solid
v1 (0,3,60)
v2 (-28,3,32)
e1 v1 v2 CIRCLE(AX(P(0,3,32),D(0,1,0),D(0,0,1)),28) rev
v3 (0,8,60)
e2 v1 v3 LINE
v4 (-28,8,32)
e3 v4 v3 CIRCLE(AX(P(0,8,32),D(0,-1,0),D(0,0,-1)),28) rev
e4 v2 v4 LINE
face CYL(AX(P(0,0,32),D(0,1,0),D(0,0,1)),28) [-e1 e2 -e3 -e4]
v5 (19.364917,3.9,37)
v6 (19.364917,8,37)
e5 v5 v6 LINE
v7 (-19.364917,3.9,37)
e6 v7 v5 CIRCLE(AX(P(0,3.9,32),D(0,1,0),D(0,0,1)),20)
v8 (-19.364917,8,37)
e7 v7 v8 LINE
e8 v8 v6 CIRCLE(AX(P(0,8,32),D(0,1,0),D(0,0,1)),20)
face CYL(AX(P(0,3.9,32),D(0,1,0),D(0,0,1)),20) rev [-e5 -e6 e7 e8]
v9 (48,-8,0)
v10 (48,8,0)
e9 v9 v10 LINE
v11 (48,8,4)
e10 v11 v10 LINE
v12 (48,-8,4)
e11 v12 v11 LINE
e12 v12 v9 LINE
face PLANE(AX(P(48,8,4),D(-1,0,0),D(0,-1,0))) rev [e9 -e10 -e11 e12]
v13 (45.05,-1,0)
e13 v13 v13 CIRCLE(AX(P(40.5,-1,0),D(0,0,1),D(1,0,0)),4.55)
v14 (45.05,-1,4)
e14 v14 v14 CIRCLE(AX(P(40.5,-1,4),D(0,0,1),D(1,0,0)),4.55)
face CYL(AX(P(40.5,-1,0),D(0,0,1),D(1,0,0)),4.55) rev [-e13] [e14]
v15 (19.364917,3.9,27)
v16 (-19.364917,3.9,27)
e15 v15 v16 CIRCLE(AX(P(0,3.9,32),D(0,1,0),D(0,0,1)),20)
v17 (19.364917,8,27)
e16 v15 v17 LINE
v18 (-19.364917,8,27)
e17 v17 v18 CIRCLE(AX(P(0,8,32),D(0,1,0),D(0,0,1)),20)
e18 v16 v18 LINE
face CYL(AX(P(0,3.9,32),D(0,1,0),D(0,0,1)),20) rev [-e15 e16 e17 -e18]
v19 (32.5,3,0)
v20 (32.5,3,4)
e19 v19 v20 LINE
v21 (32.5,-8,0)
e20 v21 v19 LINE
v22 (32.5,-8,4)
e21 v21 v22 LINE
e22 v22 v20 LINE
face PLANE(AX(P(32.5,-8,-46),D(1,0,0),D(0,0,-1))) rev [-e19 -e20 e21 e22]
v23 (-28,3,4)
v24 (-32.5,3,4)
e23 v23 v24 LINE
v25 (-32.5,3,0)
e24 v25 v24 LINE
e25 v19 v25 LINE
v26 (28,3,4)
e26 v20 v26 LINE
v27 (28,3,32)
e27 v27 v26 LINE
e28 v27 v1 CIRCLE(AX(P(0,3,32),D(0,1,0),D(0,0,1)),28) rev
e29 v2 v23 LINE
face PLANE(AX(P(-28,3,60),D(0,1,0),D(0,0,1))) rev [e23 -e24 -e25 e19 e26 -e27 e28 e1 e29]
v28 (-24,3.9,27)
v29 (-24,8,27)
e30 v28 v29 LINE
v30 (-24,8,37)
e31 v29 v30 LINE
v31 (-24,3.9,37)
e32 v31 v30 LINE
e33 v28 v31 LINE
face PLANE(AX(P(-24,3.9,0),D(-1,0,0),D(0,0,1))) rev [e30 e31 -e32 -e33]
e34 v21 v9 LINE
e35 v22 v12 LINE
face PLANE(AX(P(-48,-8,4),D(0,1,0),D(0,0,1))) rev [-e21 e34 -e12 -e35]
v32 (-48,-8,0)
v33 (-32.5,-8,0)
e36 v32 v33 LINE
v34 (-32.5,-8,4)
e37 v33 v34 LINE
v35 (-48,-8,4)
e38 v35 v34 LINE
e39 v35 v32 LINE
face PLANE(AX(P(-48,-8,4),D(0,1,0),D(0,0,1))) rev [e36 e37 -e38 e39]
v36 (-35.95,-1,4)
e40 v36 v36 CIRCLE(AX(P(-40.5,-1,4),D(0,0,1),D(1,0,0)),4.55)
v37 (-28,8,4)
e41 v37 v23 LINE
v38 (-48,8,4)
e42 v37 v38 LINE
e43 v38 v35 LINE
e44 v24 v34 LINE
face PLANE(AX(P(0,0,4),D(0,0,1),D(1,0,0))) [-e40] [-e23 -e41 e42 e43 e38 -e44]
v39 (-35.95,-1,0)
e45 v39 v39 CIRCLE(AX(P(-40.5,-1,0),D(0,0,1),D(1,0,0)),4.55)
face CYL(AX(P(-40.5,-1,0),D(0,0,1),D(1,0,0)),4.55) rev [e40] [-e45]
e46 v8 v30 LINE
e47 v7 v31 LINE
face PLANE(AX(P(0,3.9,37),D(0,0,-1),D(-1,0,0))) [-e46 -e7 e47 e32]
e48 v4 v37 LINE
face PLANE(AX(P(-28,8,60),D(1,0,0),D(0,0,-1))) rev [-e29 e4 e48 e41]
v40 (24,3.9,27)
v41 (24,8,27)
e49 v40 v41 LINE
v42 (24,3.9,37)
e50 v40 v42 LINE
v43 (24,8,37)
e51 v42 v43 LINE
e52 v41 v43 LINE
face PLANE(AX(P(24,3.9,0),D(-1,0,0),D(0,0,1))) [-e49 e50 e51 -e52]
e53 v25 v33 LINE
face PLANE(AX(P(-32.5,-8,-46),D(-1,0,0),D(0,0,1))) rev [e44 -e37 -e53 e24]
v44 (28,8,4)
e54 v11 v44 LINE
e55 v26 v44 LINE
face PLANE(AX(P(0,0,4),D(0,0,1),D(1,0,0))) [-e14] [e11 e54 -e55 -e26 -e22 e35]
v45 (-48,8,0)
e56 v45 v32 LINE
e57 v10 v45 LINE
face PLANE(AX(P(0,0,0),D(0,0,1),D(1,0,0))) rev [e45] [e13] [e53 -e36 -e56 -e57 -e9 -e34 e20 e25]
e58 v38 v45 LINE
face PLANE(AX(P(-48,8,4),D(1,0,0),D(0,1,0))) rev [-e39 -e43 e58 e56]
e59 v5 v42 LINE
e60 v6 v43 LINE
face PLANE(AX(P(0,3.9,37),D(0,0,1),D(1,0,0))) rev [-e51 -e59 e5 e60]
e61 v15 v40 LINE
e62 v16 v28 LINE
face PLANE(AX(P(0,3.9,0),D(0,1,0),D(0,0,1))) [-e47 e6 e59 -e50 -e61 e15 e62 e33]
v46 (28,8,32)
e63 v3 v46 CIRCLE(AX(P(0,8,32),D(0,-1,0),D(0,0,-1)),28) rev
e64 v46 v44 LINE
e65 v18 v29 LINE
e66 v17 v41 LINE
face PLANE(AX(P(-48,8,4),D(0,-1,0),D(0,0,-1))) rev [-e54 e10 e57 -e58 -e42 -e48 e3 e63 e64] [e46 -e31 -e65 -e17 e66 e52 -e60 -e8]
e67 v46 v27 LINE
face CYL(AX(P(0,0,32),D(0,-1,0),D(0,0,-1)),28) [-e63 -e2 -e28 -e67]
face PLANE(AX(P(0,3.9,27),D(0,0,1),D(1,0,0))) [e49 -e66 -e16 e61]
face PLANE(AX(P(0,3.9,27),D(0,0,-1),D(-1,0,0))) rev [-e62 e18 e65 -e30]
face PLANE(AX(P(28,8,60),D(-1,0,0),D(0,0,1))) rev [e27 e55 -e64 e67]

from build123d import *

# Parameters (mm, degrees)
SKETCH_1_W          = 96
SKETCH_1_H          = 16
EXTRUDE_1_DEPTH     = 4
SKETCH_2_W          = 56
SKETCH_2_H          = 5
EXTRUDE_2_DEPTH     = 56
SKETCH_3_W          = 65
SKETCH_3_H          = 11
CUT_EXTRUDE_1_DEPTH = 50
SKETCH_4_R          = 4.55
CUT_EXTRUDE_2_DEPTH = 75.188947964
FILLET_1_R          = 28
CUT_EXTRUDE_3_DEPTH = 4.1


with BuildPart() as part:
    # 스케치1 → 보스-돌출1 (new body)
    with BuildSketch(Plane.XY):
        Rectangle(SKETCH_1_W, SKETCH_1_H)
    extrude(amount=EXTRUDE_1_DEPTH)

    # 스케치2 → 보스-돌출2 (add)
    with BuildSketch(Plane.XY.offset(4)):
        with Locations((0, 5.5)):
            Rectangle(SKETCH_2_W, SKETCH_2_H)
    extrude(amount=EXTRUDE_2_DEPTH)

    # 스케치3 → 컷-돌출1 (cut)
    with BuildSketch(Plane.XY.offset(4)):
        with Locations((0, -2.5)):
            Rectangle(SKETCH_3_W, SKETCH_3_H)
    extrude(amount=-CUT_EXTRUDE_1_DEPTH, mode=Mode.SUBTRACT)

    # 스케치4 → 컷-돌출2 (cut, through all)
    with BuildSketch(Plane.XY.offset(4)):
        with Locations((40.5, -1)):
            Circle(SKETCH_4_R)
        with Locations((-40.5, -1)):
            Circle(SKETCH_4_R)
    extrude(amount=-CUT_EXTRUDE_2_DEPTH, mode=Mode.SUBTRACT)

    # 필렛1
    fillet_1_edges = [part.edges().sort_by_distance(p)[0] for p in [
        (-28, 5.5, 60),
        (28, 5.5, 60),
    ]]
    fillet(fillet_1_edges, radius=FILLET_1_R - 0.0001)  # a hair under: the kernel refuses the full size

    # 스케치5 → 컷-돌출3 (cut)
    with BuildSketch(Plane(origin=(0, 8, 0), x_dir=(1, 0, 0), z_dir=(0, 1, 0))):
        with BuildLine():
            Line((-19.364916731, -27), (-16, -27))
            Line((-16, -27), (-16, -37))
            Line((-16, -37), (-19.364916731, -37))
            ThreePointArc((-19.364916731, -37), (0, -52), (19.364916731, -37))
            Line((19.364916731, -37), (16, -37))
            Line((16, -37), (16, -27))
            Line((16, -27), (19.364916731, -27))
            ThreePointArc((19.364916731, -27), (0, -12), (-19.364916731, -27))
        make_face()
        with BuildLine():
            ThreePointArc((20, -32), (19.840593925, -29.47991415), (19.364916731, -27))
            Line((19.364916731, -27), (16, -27))
            Line((16, -27), (16, -37))
            Line((16, -37), (19.364916731, -37))
            ThreePointArc((19.364916731, -37), (19.840593925, -34.52008585), (20, -32))
        make_face()
        with BuildLine():
            Line((24, -27), (19.364916731, -27))
            ThreePointArc((19.364916731, -27), (19.840593925, -29.47991415), (20, -32))
            ThreePointArc((20, -32), (19.840593925, -34.52008585), (19.364916731, -37))
            Line((19.364916731, -37), (24, -37))
            Line((24, -37), (24, -27))
        make_face()
        with BuildLine():
            Line((-16, -37), (-16, -27))
            Line((-16, -27), (-19.364916731, -27))
            ThreePointArc((-19.364916731, -27), (-20, -32), (-19.364916731, -37))
            Line((-19.364916731, -37), (-16, -37))
        make_face()
        with BuildLine():
            ThreePointArc((-19.364916731, -37), (-20, -32), (-19.364916731, -27))
            Line((-19.364916731, -27), (-24, -27))
            Line((-24, -27), (-24, -37))
            Line((-24, -37), (-19.364916731, -37))
        make_face()
    extrude(amount=-CUT_EXTRUDE_3_DEPTH, mode=Mode.SUBTRACT)


solid = part.part
